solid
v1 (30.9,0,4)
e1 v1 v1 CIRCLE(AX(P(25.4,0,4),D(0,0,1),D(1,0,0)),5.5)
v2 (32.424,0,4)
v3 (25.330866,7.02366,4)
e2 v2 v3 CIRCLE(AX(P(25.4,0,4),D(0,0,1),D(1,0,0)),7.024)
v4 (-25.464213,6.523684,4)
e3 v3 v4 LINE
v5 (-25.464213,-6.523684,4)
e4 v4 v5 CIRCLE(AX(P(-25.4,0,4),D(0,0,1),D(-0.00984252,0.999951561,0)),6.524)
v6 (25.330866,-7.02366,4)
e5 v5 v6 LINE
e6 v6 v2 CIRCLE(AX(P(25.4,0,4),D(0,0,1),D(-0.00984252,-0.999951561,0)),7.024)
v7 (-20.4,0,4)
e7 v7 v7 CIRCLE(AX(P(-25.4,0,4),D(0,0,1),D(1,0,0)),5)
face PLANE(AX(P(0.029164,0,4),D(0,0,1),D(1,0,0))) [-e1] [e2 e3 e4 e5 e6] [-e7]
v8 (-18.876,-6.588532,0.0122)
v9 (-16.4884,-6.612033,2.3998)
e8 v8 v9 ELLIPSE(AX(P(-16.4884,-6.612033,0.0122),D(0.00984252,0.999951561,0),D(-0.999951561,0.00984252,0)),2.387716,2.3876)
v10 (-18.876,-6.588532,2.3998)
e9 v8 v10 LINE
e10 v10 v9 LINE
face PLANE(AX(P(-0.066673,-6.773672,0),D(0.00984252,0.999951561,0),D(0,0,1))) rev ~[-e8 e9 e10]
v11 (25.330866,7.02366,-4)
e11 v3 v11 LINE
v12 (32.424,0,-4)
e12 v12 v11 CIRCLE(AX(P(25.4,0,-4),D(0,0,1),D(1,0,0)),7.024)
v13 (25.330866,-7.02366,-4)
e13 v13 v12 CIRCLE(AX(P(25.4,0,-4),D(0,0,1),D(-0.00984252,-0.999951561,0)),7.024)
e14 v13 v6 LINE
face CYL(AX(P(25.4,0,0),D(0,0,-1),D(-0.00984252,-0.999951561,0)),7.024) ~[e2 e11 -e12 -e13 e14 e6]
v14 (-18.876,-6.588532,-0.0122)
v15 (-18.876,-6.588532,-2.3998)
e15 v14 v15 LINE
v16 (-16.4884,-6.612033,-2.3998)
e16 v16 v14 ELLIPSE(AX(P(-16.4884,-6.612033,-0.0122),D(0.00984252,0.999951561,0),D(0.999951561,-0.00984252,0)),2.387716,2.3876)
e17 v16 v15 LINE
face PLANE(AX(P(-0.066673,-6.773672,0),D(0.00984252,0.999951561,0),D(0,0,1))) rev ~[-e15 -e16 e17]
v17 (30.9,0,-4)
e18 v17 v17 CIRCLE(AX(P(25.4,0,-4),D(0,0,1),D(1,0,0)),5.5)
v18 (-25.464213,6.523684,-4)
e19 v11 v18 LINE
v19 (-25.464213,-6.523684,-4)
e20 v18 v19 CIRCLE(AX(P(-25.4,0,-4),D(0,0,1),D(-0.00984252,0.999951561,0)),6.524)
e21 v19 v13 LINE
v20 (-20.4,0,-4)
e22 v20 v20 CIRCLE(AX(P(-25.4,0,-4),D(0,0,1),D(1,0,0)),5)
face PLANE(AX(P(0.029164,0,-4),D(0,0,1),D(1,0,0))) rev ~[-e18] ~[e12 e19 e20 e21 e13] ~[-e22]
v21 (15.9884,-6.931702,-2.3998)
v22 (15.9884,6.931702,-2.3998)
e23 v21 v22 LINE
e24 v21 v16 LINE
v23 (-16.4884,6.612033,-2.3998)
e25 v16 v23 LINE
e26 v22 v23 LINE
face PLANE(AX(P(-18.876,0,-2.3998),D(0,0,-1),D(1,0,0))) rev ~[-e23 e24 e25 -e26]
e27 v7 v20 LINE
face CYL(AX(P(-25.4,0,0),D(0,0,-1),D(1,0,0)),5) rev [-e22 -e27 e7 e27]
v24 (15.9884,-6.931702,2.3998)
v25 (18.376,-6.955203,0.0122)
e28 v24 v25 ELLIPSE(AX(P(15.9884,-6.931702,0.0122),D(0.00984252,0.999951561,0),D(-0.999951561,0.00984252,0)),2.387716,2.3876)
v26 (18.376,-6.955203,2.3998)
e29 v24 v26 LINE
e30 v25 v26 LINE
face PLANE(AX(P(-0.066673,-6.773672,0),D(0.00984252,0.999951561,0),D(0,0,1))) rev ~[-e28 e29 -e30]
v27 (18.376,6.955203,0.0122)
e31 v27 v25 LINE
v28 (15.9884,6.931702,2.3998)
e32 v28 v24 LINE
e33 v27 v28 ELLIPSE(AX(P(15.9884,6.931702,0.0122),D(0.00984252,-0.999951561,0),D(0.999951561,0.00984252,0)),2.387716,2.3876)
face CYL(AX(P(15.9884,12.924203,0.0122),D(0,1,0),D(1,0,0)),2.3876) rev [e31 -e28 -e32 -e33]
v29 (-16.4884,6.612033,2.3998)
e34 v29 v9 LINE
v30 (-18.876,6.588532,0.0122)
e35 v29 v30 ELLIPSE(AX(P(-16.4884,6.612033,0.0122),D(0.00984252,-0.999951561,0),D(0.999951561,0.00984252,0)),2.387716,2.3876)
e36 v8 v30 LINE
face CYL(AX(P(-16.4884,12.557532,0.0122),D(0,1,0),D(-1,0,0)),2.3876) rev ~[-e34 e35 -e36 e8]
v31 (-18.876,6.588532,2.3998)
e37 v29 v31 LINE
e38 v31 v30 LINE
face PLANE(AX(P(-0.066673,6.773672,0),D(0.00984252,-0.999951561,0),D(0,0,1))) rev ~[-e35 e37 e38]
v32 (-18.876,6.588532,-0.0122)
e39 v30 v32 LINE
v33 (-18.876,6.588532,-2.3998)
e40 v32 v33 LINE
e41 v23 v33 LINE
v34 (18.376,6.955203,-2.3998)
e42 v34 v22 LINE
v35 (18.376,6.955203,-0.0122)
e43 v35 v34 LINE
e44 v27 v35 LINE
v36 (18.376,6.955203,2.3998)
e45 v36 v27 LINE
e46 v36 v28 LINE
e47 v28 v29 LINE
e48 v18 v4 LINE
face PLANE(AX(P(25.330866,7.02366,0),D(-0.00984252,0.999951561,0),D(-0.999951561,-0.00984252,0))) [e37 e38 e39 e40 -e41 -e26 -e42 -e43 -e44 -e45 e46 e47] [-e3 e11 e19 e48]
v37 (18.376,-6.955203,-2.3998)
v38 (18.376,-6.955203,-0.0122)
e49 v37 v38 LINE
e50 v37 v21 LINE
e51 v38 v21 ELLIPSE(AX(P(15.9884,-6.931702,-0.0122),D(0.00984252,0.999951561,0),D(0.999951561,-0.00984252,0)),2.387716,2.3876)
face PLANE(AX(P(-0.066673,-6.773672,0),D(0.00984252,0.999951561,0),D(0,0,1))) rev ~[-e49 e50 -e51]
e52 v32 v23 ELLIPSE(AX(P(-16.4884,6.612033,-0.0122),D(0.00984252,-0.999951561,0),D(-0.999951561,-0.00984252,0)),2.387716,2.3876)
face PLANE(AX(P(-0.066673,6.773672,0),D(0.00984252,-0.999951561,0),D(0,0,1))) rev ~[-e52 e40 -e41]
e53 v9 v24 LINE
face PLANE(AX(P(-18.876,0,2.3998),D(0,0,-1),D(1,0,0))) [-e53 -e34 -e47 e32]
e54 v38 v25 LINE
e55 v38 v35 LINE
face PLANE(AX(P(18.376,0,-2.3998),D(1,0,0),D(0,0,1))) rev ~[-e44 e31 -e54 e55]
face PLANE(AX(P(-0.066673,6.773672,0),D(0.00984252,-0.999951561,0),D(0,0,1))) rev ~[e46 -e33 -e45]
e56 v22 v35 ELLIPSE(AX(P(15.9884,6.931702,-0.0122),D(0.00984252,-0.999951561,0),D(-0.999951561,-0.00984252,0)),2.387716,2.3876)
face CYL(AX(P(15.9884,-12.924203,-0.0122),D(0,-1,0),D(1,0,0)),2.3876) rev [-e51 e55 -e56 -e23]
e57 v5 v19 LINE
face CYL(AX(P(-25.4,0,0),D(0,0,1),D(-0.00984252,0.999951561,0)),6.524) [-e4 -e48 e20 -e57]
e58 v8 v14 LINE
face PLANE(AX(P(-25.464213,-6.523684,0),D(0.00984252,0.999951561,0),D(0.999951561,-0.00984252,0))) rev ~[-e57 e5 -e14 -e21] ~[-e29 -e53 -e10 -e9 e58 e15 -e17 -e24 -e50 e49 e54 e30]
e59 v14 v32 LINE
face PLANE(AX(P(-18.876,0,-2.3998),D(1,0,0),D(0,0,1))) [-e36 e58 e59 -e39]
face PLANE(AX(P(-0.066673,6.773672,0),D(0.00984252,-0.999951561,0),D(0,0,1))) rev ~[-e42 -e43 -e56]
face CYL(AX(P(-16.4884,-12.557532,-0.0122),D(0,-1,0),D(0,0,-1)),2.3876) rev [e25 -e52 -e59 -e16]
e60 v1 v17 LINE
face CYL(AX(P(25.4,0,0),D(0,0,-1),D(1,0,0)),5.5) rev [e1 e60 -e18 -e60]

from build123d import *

# Parameters (mm, degrees)
F0_R          = 5.5
F0_R_2        = 5
F2_DEPTH      = 4
F3_W          = 37.252
F3_H          = 4.7996
F4_DEPTH      = 7.025
F4_DEPTH_BACK = 7.025
F5_T4_DEPTH   = 25.1150634776
F5_T10_DEPTH  = 25.1150634776
F5_T16_DEPTH  = 25.8484060864
F5_T22_DEPTH  = 25.8484060864


# Not quite as in the source:
# - a fillet or chamfer that OpenCascade refuses, or shapes differently, is made with other operations: its cross-section is extruded or revolved along the edge and cut away or added


with BuildPart() as f2:
    # F0 (on Top) → F2 (new body, symmetric)
    with BuildSketch(Plane.XY):
        with BuildLine():
            ThreePointArc((-25.4642125984, 6.5236839855), (-20.8095940807, 4.6358116329), (-18.876, 0))
            ThreePointArc((-18.876, 0), (-20.8095940807, -4.6358116329), (-25.4642125984, -6.5236839855))
            Line((-25.4642125984, -6.5236839855), (25.3308661417, -7.0236597661))
            ThreePointArc((25.3308661417, -7.0236597661), (18.376, 0), (25.3308661417, 7.0236597661))
            Line((25.3308661417, 7.0236597661), (-25.4642125984, 6.5236839855))
        make_face()
        with BuildLine():
            ThreePointArc((32.424, 0), (30.3422150793, 4.9911006913), (25.3308661417, 7.0236597661))
            ThreePointArc((25.3308661417, 7.0236597661), (18.376, 0), (25.3308661417, -7.0236597661))
            ThreePointArc((25.3308661417, -7.0236597661), (30.3422150793, -4.9911006913), (32.424, 0))
        make_face()
        with Locations((25.4, 0)):
            Circle(F0_R, mode=Mode.SUBTRACT)
        with BuildLine():
            ThreePointArc((-25.4642125984, -6.5236839855), (-20.8095940807, -4.6358116329), (-18.876, 0))
            ThreePointArc((-18.876, 0), (-20.8095940807, 4.6358116329), (-25.4642125984, 6.5236839855))
            ThreePointArc((-25.4642125984, 6.5236839855), (-31.924, 0), (-25.4642125984, -6.5236839855))
        make_face()
        with Locations((-25.4, 0)):
            Circle(F0_R_2, mode=Mode.SUBTRACT)
    extrude(amount=F2_DEPTH, both=True)

    # F3 (on Front) → F4 (cut, two sides)
    with BuildSketch(Plane.XZ) as f4_sk:
        with Locations((-0.25, 0)):
            Rectangle(F3_W, F3_H)
    extrude(amount=-F4_DEPTH, mode=Mode.SUBTRACT)
    extrude(f4_sk.sketch, amount=F4_DEPTH_BACK, mode=Mode.SUBTRACT)

    # F5: fillet of radius 2.3876 on 4 edges, made by hand


with BuildPart() as f5_tool2:
    # F5_s3 → F5_t4 (new body)
    with BuildSketch(Plane.XZ.offset(-12.5575317388)):
        with BuildLine():
            ThreePointArc((-18.876, 0.0122), (-18.1766881508, 1.7004881508), (-16.4884, 2.3998))
            Line((-16.4884, 2.3998), (-18.876, 2.3998))
            Line((-18.876, 2.3998), (-18.876, 0.0122))
        make_face()
    extrude(amount=F5_T4_DEPTH)

    split(bisect_by=Plane(origin=(-0.0666732283, 6.7736718758, 0), x_dir=(0, 0, 1), z_dir=(0.0098425197, -0.9999515612, 0)), keep=Keep.TOP)

    split(bisect_by=Plane(origin=(-0.0666732283, -6.7736718758, 0), x_dir=(0, 0, 1), z_dir=(0.0098425197, 0.9999515612, 0)), keep=Keep.TOP)


with BuildPart() as f2_1:
    add(f2.part)

    # F5_t1: union F5_tool2
    add(f5_tool2.part)


with BuildPart() as f5_tool8:
    # F5_s9 → F5_t10 (new body)
    with BuildSketch(Plane.XZ.offset(12.5575317388)):
        with BuildLine():
            ThreePointArc((-16.4884, -2.3998), (-18.1766881508, -1.7004881508), (-18.876, -0.0122))
            Line((-18.876, -0.0122), (-18.876, -2.3998))
            Line((-18.876, -2.3998), (-16.4884, -2.3998))
        make_face()
    extrude(amount=-F5_T10_DEPTH)

    split(bisect_by=Plane(origin=(-0.0666732283, 6.7736718758, 0), x_dir=(0, 0, 1), z_dir=(0.0098425197, -0.9999515612, 0)), keep=Keep.TOP)

    split(bisect_by=Plane(origin=(-0.0666732283, -6.7736718758, 0), x_dir=(0, 0, 1), z_dir=(0.0098425197, 0.9999515612, 0)), keep=Keep.TOP)


with BuildPart() as f2_2:
    add(f2_1.part)

    # F5_t7: union F5_tool8
    add(f5_tool8.part)


with BuildPart() as f5_tool14:
    # F5_s15 → F5_t16 (new body)
    with BuildSketch(Plane.XZ.offset(12.9242030432)):
        with BuildLine():
            ThreePointArc((18.376, -0.0122), (17.6766881508, -1.7004881508), (15.9884, -2.3998))
            Line((15.9884, -2.3998), (18.376, -2.3998))
            Line((18.376, -2.3998), (18.376, -0.0122))
        make_face()
    extrude(amount=-F5_T16_DEPTH)

    split(bisect_by=Plane(origin=(-0.0666732283, 6.7736718758, 0), x_dir=(0, 0, 1), z_dir=(0.0098425197, -0.9999515612, 0)), keep=Keep.TOP)

    split(bisect_by=Plane(origin=(-0.0666732283, -6.7736718758, 0), x_dir=(0, 0, 1), z_dir=(0.0098425197, 0.9999515612, 0)), keep=Keep.TOP)


with BuildPart() as f2_3:
    add(f2_2.part)

    # F5_t13: union F5_tool14
    add(f5_tool14.part)


with BuildPart() as f5_tool20:
    # F5_s21 → F5_t22 (new body)
    with BuildSketch(Plane.XZ.offset(-12.9242030432)):
        with BuildLine():
            ThreePointArc((18.376, 0.0122), (17.6766881508, 1.7004881508), (15.9884, 2.3998))
            Line((15.9884, 2.3998), (18.376, 2.3998))
            Line((18.376, 2.3998), (18.376, 0.0122))
        make_face()
    extrude(amount=F5_T22_DEPTH)

    split(bisect_by=Plane(origin=(-0.0666732283, 6.7736718758, 0), x_dir=(0, 0, 1), z_dir=(0.0098425197, -0.9999515612, 0)), keep=Keep.TOP)

    split(bisect_by=Plane(origin=(-0.0666732283, -6.7736718758, 0), x_dir=(0, 0, 1), z_dir=(0.0098425197, 0.9999515612, 0)), keep=Keep.TOP)


with BuildPart() as f2_4:
    add(f2_3.part)

    # F5_t19: union F5_tool20
    add(f5_tool20.part)


solid = f2_4.part
